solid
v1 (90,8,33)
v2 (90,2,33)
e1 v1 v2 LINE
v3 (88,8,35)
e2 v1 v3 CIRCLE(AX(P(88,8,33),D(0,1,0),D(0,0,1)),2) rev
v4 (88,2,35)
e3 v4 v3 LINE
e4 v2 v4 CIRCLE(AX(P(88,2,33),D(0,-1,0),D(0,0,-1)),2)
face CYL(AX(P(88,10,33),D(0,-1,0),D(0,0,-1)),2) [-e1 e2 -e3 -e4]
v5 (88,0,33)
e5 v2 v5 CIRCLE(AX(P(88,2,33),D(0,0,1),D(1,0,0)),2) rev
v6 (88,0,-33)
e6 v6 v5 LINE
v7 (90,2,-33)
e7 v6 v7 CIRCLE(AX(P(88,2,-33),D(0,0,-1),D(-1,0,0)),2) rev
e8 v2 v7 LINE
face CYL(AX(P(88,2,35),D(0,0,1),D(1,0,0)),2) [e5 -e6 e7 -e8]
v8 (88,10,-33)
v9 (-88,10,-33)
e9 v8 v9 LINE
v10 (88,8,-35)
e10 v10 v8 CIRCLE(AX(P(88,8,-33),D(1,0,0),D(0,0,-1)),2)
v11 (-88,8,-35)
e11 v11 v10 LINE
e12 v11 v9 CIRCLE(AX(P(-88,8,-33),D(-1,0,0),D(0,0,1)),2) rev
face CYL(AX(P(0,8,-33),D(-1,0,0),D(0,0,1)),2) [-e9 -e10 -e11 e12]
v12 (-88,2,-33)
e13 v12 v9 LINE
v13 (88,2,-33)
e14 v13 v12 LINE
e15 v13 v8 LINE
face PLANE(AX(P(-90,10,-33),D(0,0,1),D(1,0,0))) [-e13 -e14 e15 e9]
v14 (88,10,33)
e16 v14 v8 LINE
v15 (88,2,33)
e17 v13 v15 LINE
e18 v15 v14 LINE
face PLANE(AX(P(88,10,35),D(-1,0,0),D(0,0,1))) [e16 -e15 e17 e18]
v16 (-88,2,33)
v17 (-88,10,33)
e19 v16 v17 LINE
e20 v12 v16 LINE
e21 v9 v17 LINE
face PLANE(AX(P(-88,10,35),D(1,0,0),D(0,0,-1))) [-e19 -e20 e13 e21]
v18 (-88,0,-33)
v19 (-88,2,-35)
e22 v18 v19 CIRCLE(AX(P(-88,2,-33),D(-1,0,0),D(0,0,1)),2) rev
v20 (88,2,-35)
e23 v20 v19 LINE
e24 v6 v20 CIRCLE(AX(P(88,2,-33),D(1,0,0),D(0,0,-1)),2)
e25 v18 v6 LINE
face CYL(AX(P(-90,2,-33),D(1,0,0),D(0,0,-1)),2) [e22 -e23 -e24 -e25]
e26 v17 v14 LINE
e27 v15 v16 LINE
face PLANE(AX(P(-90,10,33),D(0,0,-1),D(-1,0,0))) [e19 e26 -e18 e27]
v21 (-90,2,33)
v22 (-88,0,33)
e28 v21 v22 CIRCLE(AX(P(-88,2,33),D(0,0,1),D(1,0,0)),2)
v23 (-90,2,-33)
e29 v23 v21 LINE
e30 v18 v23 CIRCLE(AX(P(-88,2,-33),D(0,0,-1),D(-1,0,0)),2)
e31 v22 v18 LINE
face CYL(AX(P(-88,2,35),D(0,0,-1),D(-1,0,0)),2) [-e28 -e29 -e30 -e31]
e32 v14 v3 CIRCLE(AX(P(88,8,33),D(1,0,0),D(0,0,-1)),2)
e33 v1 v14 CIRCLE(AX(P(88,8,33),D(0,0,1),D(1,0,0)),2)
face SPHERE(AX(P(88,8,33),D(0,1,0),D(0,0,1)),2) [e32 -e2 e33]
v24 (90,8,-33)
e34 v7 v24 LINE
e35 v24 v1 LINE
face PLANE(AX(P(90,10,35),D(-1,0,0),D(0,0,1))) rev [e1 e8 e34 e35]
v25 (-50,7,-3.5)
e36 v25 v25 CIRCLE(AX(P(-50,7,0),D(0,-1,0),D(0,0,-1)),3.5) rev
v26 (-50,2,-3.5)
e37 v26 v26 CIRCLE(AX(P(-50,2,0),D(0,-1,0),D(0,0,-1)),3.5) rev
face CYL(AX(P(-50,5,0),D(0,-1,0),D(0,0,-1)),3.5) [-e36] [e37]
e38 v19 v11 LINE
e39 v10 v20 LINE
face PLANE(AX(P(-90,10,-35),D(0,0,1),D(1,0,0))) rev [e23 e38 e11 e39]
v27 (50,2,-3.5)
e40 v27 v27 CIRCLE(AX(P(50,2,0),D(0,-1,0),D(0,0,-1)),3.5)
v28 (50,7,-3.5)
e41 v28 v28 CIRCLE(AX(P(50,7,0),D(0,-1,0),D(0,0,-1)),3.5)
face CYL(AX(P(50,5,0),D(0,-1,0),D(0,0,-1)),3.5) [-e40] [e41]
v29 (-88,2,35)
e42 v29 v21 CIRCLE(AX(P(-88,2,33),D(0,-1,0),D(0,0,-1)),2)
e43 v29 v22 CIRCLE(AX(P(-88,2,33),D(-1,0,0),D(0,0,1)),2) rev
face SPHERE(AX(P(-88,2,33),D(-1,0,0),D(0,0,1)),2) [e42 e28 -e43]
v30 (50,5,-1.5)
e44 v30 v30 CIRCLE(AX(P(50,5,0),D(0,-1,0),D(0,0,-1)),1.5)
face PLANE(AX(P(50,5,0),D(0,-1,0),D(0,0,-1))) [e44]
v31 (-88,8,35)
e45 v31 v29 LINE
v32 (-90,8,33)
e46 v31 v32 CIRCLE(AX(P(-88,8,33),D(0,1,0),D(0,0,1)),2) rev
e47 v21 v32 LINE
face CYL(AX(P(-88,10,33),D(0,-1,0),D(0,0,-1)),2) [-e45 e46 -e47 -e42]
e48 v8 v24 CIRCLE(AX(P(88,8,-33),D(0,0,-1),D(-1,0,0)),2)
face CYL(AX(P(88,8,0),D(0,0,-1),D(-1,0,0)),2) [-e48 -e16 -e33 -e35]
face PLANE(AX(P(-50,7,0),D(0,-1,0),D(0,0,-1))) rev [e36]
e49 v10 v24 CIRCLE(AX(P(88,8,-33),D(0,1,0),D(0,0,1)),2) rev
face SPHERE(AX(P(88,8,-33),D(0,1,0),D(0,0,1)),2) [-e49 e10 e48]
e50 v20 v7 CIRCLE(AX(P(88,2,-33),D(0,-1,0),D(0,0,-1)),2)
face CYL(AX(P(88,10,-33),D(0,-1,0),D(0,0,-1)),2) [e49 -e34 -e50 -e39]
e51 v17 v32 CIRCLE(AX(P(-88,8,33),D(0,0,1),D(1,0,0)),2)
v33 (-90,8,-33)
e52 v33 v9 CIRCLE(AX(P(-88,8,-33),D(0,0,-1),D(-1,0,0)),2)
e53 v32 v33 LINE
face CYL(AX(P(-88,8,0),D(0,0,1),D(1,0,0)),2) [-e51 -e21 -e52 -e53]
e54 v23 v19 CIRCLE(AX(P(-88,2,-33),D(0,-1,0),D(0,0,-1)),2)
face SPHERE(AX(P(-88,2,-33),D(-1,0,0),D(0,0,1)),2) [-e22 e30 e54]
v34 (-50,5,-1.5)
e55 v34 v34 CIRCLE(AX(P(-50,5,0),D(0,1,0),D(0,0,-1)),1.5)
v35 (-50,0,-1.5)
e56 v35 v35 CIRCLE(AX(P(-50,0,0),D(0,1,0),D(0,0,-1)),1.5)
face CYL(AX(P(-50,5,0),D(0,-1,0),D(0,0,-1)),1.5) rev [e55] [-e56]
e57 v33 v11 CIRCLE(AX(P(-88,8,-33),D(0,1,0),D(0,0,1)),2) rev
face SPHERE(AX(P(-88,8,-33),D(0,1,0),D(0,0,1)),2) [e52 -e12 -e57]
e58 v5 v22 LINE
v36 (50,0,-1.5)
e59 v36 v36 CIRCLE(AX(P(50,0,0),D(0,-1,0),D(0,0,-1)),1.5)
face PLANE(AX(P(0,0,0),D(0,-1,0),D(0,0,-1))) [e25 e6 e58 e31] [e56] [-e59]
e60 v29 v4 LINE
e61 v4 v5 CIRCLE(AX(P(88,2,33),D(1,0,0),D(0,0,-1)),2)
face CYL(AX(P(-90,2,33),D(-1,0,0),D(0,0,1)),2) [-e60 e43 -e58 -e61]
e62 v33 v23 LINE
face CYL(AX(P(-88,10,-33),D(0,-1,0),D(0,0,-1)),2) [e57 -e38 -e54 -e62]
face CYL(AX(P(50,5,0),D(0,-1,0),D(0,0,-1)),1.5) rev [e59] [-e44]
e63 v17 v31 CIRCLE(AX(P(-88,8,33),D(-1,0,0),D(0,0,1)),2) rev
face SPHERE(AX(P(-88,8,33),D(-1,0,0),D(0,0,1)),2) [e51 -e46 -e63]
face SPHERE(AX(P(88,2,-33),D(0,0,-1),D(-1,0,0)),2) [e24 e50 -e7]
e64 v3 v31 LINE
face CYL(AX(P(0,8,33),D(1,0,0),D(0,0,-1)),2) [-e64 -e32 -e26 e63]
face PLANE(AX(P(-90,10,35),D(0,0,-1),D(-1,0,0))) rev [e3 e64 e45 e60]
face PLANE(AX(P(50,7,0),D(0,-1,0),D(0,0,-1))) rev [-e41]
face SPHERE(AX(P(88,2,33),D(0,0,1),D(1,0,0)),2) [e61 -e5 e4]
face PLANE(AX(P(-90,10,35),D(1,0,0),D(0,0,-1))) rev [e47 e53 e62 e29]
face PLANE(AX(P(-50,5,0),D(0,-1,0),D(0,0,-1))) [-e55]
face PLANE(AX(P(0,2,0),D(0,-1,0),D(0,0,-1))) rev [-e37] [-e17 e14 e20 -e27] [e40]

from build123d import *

# Parameters (mm, degrees)
SKETCH1_W           = 180
SKETCH1_H           = 70
BOSS_EXTRUDE1_DEPTH = 10
SKETCH2_R           = 1.5
CUT_EXTRUDE1_DEPTH  = 5
FILLET1_R           = 2
SHELL1_START        = 2
SHELL1_OUTLINE_W    = 176
SHELL1_OUTLINE_H    = 66
SHELL1_OUTLINE_R    = 3.5
SHELL1_DEPTH        = 8
SHELL1_START_2      = 7
SHELL1_2_OUTLINE_R  = 3.5
SHELL1_2_DEPTH      = 3


# Read off the part's stored shape, not the designer's step: Shell1
with BuildPart() as part:
    # Sketch1 → Boss-Extrude1 (new body)
    with BuildSketch(Plane(origin=(0, 0, 0), x_dir=(1, 0, 0), z_dir=(0, 1, 0))):
        Rectangle(SKETCH1_W, SKETCH1_H)
    extrude(amount=BOSS_EXTRUDE1_DEPTH)

    # Sketch2 → Cut-Extrude1 (cut)
    with BuildSketch(Plane.XZ):
        with Locations(Location((50, 0, 0), (0, 0, 270))):
            Circle(SKETCH2_R)
    cut_extrude1 = extrude(amount=-CUT_EXTRUDE1_DEPTH, mode=Mode.SUBTRACT)

    # Mirror1: Cut-Extrude1 across plane
    add(cut_extrude1.mirror(Plane(origin=(0, 0, 0), x_dir=(0, 0, 1), z_dir=(1, 0, 0))), mode=Mode.SUBTRACT)

    # Fillet1
    fillet1_edges = [part.edges().sort_by_distance(p)[0] for p in [
        (-90, 10, 0),
        (0, 10, 35),
        (90, 10, 0),
        (0, 0, 35),
        (-90, 0, 0),
        (0, 0, -35),
        (90, 0, 0),
        (90, 5, 35),
        (-90, 5, 35),
        (-90, 5, -35),
        (90, 5, -35),
        (0, 10, -35),
    ]]
    fillet(fillet1_edges, radius=FILLET1_R)

    # Shell1 outline → Shell1 (cut)
    with BuildSketch(Plane(origin=(0, 0, 0), x_dir=(1, 0, 0), z_dir=(0, 1, 0)).offset(SHELL1_START)):
        Rectangle(SHELL1_OUTLINE_W, SHELL1_OUTLINE_H)
        with Locations((-50, 0)):
            Circle(SHELL1_OUTLINE_R, mode=Mode.SUBTRACT)
        with Locations((50, 0)):
            Circle(SHELL1_OUTLINE_R, mode=Mode.SUBTRACT)
    extrude(amount=SHELL1_DEPTH, mode=Mode.SUBTRACT)

    # Shell1 2 outline → Shell1 2 (cut)
    with BuildSketch(Plane(origin=(0, 0, 0), x_dir=(1, 0, 0), z_dir=(0, 1, 0)).offset(SHELL1_START_2)):
        with Locations((50, 0)):
            Circle(SHELL1_2_OUTLINE_R)
        with Locations((-50, 0)):
            Circle(SHELL1_2_OUTLINE_R)
    extrude(amount=SHELL1_2_DEPTH, mode=Mode.SUBTRACT)


solid = part.part
